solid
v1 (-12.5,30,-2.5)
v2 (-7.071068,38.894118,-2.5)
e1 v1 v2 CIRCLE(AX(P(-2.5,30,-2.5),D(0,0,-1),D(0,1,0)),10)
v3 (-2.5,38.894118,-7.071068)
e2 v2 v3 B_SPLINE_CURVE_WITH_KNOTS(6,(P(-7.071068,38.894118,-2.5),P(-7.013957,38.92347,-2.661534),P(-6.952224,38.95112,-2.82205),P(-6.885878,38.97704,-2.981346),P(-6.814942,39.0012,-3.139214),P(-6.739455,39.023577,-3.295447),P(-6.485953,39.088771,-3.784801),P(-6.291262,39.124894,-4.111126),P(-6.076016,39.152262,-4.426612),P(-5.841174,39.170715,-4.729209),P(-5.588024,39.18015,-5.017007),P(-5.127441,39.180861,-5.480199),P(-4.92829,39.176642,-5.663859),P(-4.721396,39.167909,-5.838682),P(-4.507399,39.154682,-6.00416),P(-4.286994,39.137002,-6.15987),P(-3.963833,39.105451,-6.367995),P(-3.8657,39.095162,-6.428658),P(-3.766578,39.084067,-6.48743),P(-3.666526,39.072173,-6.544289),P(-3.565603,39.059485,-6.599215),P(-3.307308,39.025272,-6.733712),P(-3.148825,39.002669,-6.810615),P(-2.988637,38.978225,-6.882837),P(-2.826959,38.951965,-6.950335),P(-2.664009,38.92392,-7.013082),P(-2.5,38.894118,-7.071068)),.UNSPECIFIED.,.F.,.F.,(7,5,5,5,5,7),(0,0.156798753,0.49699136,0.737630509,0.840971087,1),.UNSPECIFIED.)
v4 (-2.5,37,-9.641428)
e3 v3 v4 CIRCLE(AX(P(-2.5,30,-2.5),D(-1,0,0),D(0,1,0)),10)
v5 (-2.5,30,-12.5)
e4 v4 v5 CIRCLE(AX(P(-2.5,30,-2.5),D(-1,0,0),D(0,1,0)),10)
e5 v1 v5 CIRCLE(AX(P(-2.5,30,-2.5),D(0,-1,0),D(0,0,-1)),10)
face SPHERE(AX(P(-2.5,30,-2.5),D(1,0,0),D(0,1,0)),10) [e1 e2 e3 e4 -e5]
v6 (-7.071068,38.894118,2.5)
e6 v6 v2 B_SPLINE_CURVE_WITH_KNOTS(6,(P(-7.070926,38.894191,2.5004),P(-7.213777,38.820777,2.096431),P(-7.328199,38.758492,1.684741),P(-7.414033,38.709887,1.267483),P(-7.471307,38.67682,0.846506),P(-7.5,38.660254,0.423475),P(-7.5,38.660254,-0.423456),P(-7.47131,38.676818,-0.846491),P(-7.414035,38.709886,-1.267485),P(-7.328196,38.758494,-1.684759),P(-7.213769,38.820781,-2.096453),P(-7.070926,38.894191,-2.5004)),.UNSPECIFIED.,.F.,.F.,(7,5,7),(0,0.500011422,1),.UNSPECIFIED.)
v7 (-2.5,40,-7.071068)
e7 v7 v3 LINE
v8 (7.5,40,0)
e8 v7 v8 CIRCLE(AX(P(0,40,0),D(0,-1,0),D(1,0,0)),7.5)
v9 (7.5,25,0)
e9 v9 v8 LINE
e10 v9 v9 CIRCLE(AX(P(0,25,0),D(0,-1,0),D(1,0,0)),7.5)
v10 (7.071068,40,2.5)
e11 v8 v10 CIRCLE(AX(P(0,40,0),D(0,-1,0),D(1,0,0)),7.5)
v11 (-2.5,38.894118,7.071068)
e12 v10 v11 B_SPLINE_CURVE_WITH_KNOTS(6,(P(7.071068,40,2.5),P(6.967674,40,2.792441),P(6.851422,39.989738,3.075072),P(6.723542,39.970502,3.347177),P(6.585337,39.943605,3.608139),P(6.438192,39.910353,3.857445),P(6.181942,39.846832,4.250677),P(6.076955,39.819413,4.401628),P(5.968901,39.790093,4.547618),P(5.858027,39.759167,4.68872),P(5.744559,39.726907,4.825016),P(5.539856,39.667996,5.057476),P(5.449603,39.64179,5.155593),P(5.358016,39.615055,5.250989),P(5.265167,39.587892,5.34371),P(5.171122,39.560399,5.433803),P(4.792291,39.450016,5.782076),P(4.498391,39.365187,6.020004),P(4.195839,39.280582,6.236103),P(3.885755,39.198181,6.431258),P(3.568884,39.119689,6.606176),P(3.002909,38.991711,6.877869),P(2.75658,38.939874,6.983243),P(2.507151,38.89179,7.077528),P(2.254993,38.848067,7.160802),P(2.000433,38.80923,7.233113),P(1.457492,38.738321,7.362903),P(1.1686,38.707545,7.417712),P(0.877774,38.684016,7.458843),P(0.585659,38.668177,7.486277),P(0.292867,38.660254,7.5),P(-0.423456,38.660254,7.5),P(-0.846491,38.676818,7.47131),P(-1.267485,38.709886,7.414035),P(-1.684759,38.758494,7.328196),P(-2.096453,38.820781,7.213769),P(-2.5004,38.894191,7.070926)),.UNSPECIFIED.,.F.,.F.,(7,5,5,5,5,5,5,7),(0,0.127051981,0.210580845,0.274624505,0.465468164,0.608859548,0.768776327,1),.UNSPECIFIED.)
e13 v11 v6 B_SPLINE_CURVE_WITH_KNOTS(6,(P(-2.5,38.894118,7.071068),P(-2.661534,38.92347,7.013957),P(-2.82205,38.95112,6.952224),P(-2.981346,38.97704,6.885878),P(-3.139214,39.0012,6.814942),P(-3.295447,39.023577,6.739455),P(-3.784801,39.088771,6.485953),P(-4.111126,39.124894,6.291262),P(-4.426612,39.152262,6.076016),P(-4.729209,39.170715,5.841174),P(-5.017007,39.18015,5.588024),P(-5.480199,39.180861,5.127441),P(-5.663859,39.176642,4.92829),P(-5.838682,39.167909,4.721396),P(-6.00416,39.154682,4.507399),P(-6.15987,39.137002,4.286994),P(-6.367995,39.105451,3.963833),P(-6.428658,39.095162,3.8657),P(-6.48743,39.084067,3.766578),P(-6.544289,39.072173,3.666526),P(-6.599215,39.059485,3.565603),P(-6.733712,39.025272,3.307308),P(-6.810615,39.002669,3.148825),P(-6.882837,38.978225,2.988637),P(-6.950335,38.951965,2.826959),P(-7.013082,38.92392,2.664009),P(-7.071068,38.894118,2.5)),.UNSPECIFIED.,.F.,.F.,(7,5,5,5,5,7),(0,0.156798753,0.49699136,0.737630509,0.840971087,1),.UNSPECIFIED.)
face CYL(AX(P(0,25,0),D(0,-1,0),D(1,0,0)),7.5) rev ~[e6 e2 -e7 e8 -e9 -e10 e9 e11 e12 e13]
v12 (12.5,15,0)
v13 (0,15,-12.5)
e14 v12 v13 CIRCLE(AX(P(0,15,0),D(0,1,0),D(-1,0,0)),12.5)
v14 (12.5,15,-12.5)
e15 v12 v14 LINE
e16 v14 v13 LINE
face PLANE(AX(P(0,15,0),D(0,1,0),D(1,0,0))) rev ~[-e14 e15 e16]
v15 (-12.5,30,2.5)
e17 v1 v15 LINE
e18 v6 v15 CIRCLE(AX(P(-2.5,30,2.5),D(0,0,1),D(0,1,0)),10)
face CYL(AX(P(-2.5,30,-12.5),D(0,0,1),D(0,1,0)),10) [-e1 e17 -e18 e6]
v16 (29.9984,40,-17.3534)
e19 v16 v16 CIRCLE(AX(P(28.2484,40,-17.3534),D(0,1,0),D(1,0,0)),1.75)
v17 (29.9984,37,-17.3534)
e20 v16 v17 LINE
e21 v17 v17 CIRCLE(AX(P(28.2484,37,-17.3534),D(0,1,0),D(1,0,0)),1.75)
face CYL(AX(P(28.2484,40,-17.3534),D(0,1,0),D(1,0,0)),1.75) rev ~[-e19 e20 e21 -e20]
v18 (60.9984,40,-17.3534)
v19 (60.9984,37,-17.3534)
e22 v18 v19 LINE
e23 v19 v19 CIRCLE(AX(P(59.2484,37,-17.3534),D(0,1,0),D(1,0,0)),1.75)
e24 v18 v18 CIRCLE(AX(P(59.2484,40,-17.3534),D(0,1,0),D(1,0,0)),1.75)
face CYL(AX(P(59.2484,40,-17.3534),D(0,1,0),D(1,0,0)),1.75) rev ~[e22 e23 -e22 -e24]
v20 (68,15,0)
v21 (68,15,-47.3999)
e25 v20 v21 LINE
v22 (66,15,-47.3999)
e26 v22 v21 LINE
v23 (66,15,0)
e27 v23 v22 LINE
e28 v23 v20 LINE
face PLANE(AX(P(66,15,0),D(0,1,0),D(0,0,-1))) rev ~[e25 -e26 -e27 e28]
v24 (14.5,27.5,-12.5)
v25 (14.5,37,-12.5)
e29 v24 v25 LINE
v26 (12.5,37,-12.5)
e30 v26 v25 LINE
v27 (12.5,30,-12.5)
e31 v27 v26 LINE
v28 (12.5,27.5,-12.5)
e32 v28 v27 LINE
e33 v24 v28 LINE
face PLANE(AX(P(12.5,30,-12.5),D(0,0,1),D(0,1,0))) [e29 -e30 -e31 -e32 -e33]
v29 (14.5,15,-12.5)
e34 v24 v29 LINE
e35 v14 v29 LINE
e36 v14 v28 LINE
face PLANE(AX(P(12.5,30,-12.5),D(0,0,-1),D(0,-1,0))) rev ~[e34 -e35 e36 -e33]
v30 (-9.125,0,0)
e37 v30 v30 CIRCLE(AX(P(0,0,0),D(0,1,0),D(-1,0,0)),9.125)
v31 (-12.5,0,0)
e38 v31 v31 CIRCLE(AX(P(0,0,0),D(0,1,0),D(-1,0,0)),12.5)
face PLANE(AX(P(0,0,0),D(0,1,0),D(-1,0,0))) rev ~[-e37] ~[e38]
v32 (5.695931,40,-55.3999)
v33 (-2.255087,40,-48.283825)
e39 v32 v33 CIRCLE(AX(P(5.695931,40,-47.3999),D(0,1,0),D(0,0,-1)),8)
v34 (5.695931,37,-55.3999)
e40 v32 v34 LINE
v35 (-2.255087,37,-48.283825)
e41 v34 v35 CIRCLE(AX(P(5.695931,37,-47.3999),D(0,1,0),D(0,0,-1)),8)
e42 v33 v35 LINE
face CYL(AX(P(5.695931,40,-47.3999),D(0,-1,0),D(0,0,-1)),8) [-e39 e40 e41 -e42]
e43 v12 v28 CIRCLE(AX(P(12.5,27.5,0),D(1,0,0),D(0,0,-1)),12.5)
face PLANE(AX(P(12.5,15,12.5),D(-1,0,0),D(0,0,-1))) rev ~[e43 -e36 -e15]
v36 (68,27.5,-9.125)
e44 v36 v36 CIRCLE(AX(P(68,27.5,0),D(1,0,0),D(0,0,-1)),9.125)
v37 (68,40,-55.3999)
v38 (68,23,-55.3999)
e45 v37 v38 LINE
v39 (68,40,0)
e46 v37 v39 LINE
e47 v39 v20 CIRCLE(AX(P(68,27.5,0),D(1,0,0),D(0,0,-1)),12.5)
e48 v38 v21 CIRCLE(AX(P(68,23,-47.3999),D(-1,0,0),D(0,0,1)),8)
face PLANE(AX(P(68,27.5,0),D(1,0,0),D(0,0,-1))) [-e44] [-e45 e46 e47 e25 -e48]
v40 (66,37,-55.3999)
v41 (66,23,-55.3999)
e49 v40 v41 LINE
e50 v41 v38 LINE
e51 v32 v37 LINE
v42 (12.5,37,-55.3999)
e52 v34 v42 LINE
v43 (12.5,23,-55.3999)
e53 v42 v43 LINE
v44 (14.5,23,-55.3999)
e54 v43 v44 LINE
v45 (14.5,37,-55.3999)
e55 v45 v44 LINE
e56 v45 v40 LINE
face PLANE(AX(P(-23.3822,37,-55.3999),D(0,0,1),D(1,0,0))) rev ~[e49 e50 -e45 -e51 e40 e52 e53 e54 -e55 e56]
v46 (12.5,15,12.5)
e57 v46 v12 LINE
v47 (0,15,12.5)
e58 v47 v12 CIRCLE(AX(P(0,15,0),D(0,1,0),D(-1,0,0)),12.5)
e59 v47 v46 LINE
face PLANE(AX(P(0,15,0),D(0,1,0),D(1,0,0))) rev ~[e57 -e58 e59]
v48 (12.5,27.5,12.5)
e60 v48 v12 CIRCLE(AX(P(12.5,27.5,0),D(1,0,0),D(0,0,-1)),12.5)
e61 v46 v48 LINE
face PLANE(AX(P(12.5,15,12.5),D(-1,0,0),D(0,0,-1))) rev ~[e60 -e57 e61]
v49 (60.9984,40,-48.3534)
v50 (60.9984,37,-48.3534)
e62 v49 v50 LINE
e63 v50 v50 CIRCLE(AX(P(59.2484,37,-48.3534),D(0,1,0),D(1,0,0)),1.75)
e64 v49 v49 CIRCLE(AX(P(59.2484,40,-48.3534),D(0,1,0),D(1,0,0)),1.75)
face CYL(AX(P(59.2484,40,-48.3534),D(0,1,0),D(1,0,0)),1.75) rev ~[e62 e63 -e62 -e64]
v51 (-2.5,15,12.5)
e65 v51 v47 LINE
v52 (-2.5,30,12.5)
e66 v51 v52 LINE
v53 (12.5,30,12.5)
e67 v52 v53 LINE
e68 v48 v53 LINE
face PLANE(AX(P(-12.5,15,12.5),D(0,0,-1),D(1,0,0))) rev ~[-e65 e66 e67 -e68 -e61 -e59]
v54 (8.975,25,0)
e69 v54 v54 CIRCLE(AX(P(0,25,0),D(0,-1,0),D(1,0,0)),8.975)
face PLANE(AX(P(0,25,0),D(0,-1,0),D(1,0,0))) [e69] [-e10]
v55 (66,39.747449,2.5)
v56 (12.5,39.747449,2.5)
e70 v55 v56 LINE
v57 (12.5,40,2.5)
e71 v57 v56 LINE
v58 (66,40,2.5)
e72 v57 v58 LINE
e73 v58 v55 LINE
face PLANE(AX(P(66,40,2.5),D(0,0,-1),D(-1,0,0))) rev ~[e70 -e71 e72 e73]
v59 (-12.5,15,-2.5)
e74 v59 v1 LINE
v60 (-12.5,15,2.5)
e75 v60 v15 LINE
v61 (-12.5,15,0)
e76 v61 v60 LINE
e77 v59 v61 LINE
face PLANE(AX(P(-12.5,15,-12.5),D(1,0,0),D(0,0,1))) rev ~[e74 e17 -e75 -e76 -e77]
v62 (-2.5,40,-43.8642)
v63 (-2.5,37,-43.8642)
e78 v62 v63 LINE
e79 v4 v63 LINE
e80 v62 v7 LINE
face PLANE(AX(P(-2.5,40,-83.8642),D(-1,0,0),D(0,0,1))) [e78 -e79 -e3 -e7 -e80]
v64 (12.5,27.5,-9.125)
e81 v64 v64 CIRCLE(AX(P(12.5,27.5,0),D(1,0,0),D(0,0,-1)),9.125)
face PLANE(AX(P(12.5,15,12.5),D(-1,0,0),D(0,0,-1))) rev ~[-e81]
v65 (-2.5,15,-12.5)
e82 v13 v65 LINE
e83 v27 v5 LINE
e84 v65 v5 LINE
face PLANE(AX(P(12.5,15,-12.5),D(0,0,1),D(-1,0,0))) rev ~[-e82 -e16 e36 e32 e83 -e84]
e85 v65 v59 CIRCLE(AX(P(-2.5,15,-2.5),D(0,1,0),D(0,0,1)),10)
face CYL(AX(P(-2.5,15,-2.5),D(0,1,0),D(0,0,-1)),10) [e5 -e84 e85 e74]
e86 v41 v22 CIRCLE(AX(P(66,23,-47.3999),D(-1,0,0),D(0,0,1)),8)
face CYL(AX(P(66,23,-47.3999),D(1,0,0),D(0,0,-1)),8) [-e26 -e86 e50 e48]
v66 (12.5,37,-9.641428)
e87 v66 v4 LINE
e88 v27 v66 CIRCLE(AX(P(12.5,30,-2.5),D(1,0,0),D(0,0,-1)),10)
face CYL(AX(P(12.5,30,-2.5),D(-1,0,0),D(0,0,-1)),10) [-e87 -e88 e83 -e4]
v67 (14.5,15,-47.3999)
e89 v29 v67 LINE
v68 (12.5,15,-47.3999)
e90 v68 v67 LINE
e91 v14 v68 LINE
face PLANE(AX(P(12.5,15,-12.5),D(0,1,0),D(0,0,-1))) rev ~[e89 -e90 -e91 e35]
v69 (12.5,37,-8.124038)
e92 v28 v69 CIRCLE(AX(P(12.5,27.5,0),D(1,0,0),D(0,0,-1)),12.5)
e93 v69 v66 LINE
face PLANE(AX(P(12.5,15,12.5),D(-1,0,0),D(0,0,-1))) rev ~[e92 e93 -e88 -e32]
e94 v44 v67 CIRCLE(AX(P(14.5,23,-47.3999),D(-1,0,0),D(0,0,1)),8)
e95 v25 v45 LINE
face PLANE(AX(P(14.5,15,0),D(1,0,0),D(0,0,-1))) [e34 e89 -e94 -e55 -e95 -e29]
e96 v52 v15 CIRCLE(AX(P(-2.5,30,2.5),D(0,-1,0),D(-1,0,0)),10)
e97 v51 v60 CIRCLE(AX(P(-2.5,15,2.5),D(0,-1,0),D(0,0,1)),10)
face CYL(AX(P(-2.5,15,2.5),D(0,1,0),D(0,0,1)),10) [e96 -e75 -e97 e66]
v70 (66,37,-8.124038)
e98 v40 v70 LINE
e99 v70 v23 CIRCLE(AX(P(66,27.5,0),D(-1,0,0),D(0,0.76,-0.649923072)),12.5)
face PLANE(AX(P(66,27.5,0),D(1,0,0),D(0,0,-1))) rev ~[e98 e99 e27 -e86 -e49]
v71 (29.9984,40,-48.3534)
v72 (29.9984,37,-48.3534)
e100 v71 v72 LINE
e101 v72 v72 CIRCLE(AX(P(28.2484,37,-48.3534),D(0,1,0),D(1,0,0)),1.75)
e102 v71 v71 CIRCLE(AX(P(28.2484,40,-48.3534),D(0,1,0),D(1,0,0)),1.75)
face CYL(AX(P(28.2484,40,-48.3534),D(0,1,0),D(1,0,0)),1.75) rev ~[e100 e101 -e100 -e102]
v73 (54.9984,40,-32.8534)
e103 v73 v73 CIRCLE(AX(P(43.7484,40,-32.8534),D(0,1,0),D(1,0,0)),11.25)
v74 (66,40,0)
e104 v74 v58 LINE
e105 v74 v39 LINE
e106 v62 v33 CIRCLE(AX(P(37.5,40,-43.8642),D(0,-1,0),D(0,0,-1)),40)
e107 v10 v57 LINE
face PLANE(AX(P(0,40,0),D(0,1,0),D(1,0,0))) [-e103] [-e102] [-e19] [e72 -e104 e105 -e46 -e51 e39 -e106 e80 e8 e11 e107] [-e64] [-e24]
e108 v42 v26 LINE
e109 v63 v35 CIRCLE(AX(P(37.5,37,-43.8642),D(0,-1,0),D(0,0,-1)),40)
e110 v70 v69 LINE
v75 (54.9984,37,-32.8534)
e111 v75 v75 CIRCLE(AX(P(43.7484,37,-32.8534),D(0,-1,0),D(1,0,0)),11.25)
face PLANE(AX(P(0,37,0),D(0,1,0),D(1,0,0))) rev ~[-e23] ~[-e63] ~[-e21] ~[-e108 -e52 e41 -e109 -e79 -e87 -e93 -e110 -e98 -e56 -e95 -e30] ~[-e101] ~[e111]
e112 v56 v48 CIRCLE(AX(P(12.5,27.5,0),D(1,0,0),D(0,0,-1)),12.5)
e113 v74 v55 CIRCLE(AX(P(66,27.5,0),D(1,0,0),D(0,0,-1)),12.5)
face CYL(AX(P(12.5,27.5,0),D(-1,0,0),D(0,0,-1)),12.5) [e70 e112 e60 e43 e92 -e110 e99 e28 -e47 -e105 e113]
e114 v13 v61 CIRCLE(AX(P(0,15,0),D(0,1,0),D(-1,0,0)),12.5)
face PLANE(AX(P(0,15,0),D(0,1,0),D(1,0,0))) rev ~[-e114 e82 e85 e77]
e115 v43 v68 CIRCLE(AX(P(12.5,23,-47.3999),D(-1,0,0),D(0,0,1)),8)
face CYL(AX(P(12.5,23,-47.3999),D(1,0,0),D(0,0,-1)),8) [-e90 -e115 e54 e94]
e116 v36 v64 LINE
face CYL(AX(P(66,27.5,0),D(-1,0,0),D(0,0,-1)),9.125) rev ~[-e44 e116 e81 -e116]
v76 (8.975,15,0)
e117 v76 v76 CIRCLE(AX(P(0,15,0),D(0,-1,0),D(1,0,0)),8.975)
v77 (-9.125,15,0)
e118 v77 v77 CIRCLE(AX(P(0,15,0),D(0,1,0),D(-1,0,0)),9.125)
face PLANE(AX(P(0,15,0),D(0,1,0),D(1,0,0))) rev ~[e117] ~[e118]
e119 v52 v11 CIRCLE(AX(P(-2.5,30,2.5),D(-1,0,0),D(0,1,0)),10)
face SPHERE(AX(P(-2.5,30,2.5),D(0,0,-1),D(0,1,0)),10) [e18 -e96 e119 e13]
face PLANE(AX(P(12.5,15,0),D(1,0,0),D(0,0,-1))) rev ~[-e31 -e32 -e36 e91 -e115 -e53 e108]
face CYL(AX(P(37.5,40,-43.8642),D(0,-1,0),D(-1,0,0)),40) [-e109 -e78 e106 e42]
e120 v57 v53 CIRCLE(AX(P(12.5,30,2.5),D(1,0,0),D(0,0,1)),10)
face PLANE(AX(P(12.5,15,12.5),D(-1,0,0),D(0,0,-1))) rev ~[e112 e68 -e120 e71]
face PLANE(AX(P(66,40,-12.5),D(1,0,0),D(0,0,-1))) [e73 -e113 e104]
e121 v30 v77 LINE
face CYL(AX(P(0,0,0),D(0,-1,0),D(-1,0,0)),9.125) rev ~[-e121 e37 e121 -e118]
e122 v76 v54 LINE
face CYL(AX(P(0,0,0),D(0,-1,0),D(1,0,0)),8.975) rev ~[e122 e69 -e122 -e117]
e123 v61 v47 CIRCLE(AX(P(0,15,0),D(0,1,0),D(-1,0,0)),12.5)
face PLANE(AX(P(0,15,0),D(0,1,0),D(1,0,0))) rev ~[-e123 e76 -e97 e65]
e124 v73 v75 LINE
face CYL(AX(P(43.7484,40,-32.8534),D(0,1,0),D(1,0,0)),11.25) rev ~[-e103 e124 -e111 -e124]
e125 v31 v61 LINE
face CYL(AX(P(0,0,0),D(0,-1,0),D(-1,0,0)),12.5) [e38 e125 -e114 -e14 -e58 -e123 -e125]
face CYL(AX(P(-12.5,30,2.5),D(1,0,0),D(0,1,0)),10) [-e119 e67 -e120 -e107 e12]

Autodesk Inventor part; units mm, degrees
ref_plane "YZ Plane" through (0, 0, 0) normal (1, 0, 0) x (0, 1, 0)
ref_plane "XZ Plane" through (0, 0, 0) normal (0, 1, 0) x (-1, 0, 0)
ref_plane "XY Plane" through (0, 0, 0) normal (0, 0, 1) x (1, 0, 0)
sketch "Sketch1" plane through (0, 0, 0) normal (0, 1, 0) x (-1, 0, 0)
  circle A0 centre (0, 0) radius 9.125
  circle A1 centre (0, 0) radius 12.5
  dimension "d0" = 18.25
  dimension "d1" = 25
extrude "Extrusion1" add sketch "Sketch1" along normal blind 15
sketch "Sketch2" plane through (0, 15, 0) normal (0, 1, 0) x (1, 0, 0)
  line L0 (-12.5, -12.5) -> (12.5, -12.5)
  line L1 (12.5, -12.5) -> (12.5, 12.5)
  line L2 (12.5, 12.5) -> (-12.5, 12.5)
  line L3 (-12.5, 12.5) -> (-12.5, -12.5)
  point P0 (0, 0)
extrude "Extrusion2" add sketch "Sketch2" along normal blind 25
sketch "Sketch3" plane through (12.5, 15, 12.5) normal (1, 0, 0) x (0, 0, -1)
  circle A0 centre (12.5, 12.5) radius 12.5
  circle A1 centre (12.5, 12.5) radius 9.125
  point P0 (12.5, -15)
  dimension "d6" = 25
  dimension "d7" = 18.25
extrude "Extrusion3" add sketch "Sketch3" along normal blind 53.5
fillet "Fillet1" radius 10 5 edges at (0, 40, -12.5) (-12.5, 40, 0) (0, 40, 12.5) (-12.5, 27.5, 12.5) (-12.5, 27.5, -12.5)
sketch "Sketch4" plane through (0, 40, 0) normal (0, 1, 0) x (1, 0, 0)
  circle A0 centre (43.7484, 32.8534) radius 11.25
  circle A1 centre (43.7484, 32.8534) radius 2.75
  circle A2 centre (28.2484, 17.3534) radius 1.75
  circle A3 centre (28.2484, 48.3534) radius 1.75
  circle A4 centre (59.2484, 48.3534) radius 1.75
  circle A5 centre (59.2484, 17.3534) radius 1.75
  line L0 (-2.5, -2.5) -> (-2.5, 2.5) projected
  line L1 (-2.5, -2.5) -> (55.5607, -2.5)
  line L2 (66, -2.5) -> (66, 83.8642)
  line L3 (55.5607, 83.8642) -> (-2.5, 83.8642)
  line L4 (-2.5, 83.8642) -> (-2.5, -2.5)
  line L5 (-47.4497, 33) -> (137.0981, 33)
  line L6 (43.6, -25.832) -> (43.6, 75.2549)
  line L7 (55.5607, 83.8642) -> (66, 83.8642)
  line L8 (66, -2.5) -> (47.9455, -2.5)
  line L9 (66, -12.5) -> (66, 12.5) projected
  point P0 (0, 0)
  dimension "d13" = 22.5
  dimension "d14" = 5.5
  dimension "d15" = 3.5
  dimension "d16" = 15.5
  dimension "d20" = 360
  dimension "d37" = 33
  dimension "d43" = 43.6
  dimension "d44" = 0
extrude "Extrusion4" add sketch "Sketch4" against normal blind 3 contours A0 L5 L2 L8 L1 L6 | A0 L5 L4 L3 L7 L2 | L6 L1 L0 L4 L5 A0
fillet "Fillet2" radius 40 1 edges at (-2.5, 38.5, -83.8642)
fillet "Fillet3" radius 10 1 edges at (66, 38.5, -83.8642)
sketch "Sketch5" plane through (66, 27.5, 0) normal (1, 0, 0) x (0, 0, -1)
  circle A0 centre (0, 0) radius 12.5
  line L0 (0, -12.5) -> (-12.5, -12.5) projected
  line L1 (0, -12.5) -> (73.8642, -12.5)
  line L2 (83.8642, 9.5) -> (83.8642, 12.5) projected
  line L3 (73.8642, -12.5) -> (73.8642, 12.5)
  line L4 (73.8642, 12.5) -> (0, 12.5)
  circle A1 centre (0, 0) radius 9.125
  line L5 (73.8642, 12.5) -> (73.8642, 9.5) projected
  point P0 (0, -27.5)
  dimension "d28" = 0
  dimension "d45" = 18.25
extrude "Extrusion5" add sketch "Sketch5" along normal blind 2
fillet "Fillet5" radius 8 2 edges at (67, 15, -73.8642) (68, 27.5, -73.8642)
sketch "Sketch6" plane through (12.5, 15, 0) normal (1, 0, 0) x (0, 0, -1)
  line L0 (12.5, 15) -> (12.5, 0) projected
  line L1 (12.5, 0) -> (65.8642, 0)
  line L2 (0, 0) -> (65.8642, 0) projected
  line L3 (65.8642, 0) -> (65.8642, 22)
  line L4 (44.1034, 22) -> (21.6034, 22) projected
  line L5 (65.8642, 0) -> (12.5, 0)
  line L6 (12.5, 0) -> (12.5, 22)
  line L7 (12.5, 22) -> (65.8642, 22)
  line L8 (65.8642, 22) -> (65.8642, 0)
  point P0 (0, -15)
  point P1 (12.5, 14.9361)
extrude "Extrusion6" add sketch "Sketch6" along normal blind 2
fillet "Fillet6" radius 8 1 edges at (13.5, 15, -65.8642)
sketch "Sketch7" plane through (0, 0, 0) normal (0, -1, 0) x (1, 0, 0)
  circle A0 centre (0, 0) radius 8.975
extrude "Extrusion7" cut sketch "Sketch7" against normal blind 25
sketch "Sketch8" plane through (0, 37, 0) normal (0, -1, 0) x (1, 0, 0)
  line L0 (-23.3822, -55.3999) -> (103.7661, -55.3999)
  line L1 (103.7661, -55.3999) -> (103.7661, -98.1886)
  line L2 (103.7661, -98.1886) -> (-23.3822, -98.1886)
  line L3 (-23.3822, -98.1886) -> (-23.3822, -55.3999)
  point P0 (0, 0)
extrude "Extrusion8" cut sketch "Sketch8" along normal mid plane 200
fillet "Fillet7" radius 8 3 edges at (-0.8005, 38.5, -55.3999) (13.5, 15, -55.3999) (67, 15, -55.3999)
extrude "Extrusion9" cut sketch "Sketch4" against normal blind 200 contours A2 | A5
sketch "Sketch9" plane through (0, 25, 0) normal (0, -1, 0) x (1, 0, 0)
  circle A0 centre (0, 0) radius 7.5
  dimension "d46" = 15
extrude "Extrusion10" cut sketch "Sketch9" against normal blind 60
properties part number "zmotormount"
